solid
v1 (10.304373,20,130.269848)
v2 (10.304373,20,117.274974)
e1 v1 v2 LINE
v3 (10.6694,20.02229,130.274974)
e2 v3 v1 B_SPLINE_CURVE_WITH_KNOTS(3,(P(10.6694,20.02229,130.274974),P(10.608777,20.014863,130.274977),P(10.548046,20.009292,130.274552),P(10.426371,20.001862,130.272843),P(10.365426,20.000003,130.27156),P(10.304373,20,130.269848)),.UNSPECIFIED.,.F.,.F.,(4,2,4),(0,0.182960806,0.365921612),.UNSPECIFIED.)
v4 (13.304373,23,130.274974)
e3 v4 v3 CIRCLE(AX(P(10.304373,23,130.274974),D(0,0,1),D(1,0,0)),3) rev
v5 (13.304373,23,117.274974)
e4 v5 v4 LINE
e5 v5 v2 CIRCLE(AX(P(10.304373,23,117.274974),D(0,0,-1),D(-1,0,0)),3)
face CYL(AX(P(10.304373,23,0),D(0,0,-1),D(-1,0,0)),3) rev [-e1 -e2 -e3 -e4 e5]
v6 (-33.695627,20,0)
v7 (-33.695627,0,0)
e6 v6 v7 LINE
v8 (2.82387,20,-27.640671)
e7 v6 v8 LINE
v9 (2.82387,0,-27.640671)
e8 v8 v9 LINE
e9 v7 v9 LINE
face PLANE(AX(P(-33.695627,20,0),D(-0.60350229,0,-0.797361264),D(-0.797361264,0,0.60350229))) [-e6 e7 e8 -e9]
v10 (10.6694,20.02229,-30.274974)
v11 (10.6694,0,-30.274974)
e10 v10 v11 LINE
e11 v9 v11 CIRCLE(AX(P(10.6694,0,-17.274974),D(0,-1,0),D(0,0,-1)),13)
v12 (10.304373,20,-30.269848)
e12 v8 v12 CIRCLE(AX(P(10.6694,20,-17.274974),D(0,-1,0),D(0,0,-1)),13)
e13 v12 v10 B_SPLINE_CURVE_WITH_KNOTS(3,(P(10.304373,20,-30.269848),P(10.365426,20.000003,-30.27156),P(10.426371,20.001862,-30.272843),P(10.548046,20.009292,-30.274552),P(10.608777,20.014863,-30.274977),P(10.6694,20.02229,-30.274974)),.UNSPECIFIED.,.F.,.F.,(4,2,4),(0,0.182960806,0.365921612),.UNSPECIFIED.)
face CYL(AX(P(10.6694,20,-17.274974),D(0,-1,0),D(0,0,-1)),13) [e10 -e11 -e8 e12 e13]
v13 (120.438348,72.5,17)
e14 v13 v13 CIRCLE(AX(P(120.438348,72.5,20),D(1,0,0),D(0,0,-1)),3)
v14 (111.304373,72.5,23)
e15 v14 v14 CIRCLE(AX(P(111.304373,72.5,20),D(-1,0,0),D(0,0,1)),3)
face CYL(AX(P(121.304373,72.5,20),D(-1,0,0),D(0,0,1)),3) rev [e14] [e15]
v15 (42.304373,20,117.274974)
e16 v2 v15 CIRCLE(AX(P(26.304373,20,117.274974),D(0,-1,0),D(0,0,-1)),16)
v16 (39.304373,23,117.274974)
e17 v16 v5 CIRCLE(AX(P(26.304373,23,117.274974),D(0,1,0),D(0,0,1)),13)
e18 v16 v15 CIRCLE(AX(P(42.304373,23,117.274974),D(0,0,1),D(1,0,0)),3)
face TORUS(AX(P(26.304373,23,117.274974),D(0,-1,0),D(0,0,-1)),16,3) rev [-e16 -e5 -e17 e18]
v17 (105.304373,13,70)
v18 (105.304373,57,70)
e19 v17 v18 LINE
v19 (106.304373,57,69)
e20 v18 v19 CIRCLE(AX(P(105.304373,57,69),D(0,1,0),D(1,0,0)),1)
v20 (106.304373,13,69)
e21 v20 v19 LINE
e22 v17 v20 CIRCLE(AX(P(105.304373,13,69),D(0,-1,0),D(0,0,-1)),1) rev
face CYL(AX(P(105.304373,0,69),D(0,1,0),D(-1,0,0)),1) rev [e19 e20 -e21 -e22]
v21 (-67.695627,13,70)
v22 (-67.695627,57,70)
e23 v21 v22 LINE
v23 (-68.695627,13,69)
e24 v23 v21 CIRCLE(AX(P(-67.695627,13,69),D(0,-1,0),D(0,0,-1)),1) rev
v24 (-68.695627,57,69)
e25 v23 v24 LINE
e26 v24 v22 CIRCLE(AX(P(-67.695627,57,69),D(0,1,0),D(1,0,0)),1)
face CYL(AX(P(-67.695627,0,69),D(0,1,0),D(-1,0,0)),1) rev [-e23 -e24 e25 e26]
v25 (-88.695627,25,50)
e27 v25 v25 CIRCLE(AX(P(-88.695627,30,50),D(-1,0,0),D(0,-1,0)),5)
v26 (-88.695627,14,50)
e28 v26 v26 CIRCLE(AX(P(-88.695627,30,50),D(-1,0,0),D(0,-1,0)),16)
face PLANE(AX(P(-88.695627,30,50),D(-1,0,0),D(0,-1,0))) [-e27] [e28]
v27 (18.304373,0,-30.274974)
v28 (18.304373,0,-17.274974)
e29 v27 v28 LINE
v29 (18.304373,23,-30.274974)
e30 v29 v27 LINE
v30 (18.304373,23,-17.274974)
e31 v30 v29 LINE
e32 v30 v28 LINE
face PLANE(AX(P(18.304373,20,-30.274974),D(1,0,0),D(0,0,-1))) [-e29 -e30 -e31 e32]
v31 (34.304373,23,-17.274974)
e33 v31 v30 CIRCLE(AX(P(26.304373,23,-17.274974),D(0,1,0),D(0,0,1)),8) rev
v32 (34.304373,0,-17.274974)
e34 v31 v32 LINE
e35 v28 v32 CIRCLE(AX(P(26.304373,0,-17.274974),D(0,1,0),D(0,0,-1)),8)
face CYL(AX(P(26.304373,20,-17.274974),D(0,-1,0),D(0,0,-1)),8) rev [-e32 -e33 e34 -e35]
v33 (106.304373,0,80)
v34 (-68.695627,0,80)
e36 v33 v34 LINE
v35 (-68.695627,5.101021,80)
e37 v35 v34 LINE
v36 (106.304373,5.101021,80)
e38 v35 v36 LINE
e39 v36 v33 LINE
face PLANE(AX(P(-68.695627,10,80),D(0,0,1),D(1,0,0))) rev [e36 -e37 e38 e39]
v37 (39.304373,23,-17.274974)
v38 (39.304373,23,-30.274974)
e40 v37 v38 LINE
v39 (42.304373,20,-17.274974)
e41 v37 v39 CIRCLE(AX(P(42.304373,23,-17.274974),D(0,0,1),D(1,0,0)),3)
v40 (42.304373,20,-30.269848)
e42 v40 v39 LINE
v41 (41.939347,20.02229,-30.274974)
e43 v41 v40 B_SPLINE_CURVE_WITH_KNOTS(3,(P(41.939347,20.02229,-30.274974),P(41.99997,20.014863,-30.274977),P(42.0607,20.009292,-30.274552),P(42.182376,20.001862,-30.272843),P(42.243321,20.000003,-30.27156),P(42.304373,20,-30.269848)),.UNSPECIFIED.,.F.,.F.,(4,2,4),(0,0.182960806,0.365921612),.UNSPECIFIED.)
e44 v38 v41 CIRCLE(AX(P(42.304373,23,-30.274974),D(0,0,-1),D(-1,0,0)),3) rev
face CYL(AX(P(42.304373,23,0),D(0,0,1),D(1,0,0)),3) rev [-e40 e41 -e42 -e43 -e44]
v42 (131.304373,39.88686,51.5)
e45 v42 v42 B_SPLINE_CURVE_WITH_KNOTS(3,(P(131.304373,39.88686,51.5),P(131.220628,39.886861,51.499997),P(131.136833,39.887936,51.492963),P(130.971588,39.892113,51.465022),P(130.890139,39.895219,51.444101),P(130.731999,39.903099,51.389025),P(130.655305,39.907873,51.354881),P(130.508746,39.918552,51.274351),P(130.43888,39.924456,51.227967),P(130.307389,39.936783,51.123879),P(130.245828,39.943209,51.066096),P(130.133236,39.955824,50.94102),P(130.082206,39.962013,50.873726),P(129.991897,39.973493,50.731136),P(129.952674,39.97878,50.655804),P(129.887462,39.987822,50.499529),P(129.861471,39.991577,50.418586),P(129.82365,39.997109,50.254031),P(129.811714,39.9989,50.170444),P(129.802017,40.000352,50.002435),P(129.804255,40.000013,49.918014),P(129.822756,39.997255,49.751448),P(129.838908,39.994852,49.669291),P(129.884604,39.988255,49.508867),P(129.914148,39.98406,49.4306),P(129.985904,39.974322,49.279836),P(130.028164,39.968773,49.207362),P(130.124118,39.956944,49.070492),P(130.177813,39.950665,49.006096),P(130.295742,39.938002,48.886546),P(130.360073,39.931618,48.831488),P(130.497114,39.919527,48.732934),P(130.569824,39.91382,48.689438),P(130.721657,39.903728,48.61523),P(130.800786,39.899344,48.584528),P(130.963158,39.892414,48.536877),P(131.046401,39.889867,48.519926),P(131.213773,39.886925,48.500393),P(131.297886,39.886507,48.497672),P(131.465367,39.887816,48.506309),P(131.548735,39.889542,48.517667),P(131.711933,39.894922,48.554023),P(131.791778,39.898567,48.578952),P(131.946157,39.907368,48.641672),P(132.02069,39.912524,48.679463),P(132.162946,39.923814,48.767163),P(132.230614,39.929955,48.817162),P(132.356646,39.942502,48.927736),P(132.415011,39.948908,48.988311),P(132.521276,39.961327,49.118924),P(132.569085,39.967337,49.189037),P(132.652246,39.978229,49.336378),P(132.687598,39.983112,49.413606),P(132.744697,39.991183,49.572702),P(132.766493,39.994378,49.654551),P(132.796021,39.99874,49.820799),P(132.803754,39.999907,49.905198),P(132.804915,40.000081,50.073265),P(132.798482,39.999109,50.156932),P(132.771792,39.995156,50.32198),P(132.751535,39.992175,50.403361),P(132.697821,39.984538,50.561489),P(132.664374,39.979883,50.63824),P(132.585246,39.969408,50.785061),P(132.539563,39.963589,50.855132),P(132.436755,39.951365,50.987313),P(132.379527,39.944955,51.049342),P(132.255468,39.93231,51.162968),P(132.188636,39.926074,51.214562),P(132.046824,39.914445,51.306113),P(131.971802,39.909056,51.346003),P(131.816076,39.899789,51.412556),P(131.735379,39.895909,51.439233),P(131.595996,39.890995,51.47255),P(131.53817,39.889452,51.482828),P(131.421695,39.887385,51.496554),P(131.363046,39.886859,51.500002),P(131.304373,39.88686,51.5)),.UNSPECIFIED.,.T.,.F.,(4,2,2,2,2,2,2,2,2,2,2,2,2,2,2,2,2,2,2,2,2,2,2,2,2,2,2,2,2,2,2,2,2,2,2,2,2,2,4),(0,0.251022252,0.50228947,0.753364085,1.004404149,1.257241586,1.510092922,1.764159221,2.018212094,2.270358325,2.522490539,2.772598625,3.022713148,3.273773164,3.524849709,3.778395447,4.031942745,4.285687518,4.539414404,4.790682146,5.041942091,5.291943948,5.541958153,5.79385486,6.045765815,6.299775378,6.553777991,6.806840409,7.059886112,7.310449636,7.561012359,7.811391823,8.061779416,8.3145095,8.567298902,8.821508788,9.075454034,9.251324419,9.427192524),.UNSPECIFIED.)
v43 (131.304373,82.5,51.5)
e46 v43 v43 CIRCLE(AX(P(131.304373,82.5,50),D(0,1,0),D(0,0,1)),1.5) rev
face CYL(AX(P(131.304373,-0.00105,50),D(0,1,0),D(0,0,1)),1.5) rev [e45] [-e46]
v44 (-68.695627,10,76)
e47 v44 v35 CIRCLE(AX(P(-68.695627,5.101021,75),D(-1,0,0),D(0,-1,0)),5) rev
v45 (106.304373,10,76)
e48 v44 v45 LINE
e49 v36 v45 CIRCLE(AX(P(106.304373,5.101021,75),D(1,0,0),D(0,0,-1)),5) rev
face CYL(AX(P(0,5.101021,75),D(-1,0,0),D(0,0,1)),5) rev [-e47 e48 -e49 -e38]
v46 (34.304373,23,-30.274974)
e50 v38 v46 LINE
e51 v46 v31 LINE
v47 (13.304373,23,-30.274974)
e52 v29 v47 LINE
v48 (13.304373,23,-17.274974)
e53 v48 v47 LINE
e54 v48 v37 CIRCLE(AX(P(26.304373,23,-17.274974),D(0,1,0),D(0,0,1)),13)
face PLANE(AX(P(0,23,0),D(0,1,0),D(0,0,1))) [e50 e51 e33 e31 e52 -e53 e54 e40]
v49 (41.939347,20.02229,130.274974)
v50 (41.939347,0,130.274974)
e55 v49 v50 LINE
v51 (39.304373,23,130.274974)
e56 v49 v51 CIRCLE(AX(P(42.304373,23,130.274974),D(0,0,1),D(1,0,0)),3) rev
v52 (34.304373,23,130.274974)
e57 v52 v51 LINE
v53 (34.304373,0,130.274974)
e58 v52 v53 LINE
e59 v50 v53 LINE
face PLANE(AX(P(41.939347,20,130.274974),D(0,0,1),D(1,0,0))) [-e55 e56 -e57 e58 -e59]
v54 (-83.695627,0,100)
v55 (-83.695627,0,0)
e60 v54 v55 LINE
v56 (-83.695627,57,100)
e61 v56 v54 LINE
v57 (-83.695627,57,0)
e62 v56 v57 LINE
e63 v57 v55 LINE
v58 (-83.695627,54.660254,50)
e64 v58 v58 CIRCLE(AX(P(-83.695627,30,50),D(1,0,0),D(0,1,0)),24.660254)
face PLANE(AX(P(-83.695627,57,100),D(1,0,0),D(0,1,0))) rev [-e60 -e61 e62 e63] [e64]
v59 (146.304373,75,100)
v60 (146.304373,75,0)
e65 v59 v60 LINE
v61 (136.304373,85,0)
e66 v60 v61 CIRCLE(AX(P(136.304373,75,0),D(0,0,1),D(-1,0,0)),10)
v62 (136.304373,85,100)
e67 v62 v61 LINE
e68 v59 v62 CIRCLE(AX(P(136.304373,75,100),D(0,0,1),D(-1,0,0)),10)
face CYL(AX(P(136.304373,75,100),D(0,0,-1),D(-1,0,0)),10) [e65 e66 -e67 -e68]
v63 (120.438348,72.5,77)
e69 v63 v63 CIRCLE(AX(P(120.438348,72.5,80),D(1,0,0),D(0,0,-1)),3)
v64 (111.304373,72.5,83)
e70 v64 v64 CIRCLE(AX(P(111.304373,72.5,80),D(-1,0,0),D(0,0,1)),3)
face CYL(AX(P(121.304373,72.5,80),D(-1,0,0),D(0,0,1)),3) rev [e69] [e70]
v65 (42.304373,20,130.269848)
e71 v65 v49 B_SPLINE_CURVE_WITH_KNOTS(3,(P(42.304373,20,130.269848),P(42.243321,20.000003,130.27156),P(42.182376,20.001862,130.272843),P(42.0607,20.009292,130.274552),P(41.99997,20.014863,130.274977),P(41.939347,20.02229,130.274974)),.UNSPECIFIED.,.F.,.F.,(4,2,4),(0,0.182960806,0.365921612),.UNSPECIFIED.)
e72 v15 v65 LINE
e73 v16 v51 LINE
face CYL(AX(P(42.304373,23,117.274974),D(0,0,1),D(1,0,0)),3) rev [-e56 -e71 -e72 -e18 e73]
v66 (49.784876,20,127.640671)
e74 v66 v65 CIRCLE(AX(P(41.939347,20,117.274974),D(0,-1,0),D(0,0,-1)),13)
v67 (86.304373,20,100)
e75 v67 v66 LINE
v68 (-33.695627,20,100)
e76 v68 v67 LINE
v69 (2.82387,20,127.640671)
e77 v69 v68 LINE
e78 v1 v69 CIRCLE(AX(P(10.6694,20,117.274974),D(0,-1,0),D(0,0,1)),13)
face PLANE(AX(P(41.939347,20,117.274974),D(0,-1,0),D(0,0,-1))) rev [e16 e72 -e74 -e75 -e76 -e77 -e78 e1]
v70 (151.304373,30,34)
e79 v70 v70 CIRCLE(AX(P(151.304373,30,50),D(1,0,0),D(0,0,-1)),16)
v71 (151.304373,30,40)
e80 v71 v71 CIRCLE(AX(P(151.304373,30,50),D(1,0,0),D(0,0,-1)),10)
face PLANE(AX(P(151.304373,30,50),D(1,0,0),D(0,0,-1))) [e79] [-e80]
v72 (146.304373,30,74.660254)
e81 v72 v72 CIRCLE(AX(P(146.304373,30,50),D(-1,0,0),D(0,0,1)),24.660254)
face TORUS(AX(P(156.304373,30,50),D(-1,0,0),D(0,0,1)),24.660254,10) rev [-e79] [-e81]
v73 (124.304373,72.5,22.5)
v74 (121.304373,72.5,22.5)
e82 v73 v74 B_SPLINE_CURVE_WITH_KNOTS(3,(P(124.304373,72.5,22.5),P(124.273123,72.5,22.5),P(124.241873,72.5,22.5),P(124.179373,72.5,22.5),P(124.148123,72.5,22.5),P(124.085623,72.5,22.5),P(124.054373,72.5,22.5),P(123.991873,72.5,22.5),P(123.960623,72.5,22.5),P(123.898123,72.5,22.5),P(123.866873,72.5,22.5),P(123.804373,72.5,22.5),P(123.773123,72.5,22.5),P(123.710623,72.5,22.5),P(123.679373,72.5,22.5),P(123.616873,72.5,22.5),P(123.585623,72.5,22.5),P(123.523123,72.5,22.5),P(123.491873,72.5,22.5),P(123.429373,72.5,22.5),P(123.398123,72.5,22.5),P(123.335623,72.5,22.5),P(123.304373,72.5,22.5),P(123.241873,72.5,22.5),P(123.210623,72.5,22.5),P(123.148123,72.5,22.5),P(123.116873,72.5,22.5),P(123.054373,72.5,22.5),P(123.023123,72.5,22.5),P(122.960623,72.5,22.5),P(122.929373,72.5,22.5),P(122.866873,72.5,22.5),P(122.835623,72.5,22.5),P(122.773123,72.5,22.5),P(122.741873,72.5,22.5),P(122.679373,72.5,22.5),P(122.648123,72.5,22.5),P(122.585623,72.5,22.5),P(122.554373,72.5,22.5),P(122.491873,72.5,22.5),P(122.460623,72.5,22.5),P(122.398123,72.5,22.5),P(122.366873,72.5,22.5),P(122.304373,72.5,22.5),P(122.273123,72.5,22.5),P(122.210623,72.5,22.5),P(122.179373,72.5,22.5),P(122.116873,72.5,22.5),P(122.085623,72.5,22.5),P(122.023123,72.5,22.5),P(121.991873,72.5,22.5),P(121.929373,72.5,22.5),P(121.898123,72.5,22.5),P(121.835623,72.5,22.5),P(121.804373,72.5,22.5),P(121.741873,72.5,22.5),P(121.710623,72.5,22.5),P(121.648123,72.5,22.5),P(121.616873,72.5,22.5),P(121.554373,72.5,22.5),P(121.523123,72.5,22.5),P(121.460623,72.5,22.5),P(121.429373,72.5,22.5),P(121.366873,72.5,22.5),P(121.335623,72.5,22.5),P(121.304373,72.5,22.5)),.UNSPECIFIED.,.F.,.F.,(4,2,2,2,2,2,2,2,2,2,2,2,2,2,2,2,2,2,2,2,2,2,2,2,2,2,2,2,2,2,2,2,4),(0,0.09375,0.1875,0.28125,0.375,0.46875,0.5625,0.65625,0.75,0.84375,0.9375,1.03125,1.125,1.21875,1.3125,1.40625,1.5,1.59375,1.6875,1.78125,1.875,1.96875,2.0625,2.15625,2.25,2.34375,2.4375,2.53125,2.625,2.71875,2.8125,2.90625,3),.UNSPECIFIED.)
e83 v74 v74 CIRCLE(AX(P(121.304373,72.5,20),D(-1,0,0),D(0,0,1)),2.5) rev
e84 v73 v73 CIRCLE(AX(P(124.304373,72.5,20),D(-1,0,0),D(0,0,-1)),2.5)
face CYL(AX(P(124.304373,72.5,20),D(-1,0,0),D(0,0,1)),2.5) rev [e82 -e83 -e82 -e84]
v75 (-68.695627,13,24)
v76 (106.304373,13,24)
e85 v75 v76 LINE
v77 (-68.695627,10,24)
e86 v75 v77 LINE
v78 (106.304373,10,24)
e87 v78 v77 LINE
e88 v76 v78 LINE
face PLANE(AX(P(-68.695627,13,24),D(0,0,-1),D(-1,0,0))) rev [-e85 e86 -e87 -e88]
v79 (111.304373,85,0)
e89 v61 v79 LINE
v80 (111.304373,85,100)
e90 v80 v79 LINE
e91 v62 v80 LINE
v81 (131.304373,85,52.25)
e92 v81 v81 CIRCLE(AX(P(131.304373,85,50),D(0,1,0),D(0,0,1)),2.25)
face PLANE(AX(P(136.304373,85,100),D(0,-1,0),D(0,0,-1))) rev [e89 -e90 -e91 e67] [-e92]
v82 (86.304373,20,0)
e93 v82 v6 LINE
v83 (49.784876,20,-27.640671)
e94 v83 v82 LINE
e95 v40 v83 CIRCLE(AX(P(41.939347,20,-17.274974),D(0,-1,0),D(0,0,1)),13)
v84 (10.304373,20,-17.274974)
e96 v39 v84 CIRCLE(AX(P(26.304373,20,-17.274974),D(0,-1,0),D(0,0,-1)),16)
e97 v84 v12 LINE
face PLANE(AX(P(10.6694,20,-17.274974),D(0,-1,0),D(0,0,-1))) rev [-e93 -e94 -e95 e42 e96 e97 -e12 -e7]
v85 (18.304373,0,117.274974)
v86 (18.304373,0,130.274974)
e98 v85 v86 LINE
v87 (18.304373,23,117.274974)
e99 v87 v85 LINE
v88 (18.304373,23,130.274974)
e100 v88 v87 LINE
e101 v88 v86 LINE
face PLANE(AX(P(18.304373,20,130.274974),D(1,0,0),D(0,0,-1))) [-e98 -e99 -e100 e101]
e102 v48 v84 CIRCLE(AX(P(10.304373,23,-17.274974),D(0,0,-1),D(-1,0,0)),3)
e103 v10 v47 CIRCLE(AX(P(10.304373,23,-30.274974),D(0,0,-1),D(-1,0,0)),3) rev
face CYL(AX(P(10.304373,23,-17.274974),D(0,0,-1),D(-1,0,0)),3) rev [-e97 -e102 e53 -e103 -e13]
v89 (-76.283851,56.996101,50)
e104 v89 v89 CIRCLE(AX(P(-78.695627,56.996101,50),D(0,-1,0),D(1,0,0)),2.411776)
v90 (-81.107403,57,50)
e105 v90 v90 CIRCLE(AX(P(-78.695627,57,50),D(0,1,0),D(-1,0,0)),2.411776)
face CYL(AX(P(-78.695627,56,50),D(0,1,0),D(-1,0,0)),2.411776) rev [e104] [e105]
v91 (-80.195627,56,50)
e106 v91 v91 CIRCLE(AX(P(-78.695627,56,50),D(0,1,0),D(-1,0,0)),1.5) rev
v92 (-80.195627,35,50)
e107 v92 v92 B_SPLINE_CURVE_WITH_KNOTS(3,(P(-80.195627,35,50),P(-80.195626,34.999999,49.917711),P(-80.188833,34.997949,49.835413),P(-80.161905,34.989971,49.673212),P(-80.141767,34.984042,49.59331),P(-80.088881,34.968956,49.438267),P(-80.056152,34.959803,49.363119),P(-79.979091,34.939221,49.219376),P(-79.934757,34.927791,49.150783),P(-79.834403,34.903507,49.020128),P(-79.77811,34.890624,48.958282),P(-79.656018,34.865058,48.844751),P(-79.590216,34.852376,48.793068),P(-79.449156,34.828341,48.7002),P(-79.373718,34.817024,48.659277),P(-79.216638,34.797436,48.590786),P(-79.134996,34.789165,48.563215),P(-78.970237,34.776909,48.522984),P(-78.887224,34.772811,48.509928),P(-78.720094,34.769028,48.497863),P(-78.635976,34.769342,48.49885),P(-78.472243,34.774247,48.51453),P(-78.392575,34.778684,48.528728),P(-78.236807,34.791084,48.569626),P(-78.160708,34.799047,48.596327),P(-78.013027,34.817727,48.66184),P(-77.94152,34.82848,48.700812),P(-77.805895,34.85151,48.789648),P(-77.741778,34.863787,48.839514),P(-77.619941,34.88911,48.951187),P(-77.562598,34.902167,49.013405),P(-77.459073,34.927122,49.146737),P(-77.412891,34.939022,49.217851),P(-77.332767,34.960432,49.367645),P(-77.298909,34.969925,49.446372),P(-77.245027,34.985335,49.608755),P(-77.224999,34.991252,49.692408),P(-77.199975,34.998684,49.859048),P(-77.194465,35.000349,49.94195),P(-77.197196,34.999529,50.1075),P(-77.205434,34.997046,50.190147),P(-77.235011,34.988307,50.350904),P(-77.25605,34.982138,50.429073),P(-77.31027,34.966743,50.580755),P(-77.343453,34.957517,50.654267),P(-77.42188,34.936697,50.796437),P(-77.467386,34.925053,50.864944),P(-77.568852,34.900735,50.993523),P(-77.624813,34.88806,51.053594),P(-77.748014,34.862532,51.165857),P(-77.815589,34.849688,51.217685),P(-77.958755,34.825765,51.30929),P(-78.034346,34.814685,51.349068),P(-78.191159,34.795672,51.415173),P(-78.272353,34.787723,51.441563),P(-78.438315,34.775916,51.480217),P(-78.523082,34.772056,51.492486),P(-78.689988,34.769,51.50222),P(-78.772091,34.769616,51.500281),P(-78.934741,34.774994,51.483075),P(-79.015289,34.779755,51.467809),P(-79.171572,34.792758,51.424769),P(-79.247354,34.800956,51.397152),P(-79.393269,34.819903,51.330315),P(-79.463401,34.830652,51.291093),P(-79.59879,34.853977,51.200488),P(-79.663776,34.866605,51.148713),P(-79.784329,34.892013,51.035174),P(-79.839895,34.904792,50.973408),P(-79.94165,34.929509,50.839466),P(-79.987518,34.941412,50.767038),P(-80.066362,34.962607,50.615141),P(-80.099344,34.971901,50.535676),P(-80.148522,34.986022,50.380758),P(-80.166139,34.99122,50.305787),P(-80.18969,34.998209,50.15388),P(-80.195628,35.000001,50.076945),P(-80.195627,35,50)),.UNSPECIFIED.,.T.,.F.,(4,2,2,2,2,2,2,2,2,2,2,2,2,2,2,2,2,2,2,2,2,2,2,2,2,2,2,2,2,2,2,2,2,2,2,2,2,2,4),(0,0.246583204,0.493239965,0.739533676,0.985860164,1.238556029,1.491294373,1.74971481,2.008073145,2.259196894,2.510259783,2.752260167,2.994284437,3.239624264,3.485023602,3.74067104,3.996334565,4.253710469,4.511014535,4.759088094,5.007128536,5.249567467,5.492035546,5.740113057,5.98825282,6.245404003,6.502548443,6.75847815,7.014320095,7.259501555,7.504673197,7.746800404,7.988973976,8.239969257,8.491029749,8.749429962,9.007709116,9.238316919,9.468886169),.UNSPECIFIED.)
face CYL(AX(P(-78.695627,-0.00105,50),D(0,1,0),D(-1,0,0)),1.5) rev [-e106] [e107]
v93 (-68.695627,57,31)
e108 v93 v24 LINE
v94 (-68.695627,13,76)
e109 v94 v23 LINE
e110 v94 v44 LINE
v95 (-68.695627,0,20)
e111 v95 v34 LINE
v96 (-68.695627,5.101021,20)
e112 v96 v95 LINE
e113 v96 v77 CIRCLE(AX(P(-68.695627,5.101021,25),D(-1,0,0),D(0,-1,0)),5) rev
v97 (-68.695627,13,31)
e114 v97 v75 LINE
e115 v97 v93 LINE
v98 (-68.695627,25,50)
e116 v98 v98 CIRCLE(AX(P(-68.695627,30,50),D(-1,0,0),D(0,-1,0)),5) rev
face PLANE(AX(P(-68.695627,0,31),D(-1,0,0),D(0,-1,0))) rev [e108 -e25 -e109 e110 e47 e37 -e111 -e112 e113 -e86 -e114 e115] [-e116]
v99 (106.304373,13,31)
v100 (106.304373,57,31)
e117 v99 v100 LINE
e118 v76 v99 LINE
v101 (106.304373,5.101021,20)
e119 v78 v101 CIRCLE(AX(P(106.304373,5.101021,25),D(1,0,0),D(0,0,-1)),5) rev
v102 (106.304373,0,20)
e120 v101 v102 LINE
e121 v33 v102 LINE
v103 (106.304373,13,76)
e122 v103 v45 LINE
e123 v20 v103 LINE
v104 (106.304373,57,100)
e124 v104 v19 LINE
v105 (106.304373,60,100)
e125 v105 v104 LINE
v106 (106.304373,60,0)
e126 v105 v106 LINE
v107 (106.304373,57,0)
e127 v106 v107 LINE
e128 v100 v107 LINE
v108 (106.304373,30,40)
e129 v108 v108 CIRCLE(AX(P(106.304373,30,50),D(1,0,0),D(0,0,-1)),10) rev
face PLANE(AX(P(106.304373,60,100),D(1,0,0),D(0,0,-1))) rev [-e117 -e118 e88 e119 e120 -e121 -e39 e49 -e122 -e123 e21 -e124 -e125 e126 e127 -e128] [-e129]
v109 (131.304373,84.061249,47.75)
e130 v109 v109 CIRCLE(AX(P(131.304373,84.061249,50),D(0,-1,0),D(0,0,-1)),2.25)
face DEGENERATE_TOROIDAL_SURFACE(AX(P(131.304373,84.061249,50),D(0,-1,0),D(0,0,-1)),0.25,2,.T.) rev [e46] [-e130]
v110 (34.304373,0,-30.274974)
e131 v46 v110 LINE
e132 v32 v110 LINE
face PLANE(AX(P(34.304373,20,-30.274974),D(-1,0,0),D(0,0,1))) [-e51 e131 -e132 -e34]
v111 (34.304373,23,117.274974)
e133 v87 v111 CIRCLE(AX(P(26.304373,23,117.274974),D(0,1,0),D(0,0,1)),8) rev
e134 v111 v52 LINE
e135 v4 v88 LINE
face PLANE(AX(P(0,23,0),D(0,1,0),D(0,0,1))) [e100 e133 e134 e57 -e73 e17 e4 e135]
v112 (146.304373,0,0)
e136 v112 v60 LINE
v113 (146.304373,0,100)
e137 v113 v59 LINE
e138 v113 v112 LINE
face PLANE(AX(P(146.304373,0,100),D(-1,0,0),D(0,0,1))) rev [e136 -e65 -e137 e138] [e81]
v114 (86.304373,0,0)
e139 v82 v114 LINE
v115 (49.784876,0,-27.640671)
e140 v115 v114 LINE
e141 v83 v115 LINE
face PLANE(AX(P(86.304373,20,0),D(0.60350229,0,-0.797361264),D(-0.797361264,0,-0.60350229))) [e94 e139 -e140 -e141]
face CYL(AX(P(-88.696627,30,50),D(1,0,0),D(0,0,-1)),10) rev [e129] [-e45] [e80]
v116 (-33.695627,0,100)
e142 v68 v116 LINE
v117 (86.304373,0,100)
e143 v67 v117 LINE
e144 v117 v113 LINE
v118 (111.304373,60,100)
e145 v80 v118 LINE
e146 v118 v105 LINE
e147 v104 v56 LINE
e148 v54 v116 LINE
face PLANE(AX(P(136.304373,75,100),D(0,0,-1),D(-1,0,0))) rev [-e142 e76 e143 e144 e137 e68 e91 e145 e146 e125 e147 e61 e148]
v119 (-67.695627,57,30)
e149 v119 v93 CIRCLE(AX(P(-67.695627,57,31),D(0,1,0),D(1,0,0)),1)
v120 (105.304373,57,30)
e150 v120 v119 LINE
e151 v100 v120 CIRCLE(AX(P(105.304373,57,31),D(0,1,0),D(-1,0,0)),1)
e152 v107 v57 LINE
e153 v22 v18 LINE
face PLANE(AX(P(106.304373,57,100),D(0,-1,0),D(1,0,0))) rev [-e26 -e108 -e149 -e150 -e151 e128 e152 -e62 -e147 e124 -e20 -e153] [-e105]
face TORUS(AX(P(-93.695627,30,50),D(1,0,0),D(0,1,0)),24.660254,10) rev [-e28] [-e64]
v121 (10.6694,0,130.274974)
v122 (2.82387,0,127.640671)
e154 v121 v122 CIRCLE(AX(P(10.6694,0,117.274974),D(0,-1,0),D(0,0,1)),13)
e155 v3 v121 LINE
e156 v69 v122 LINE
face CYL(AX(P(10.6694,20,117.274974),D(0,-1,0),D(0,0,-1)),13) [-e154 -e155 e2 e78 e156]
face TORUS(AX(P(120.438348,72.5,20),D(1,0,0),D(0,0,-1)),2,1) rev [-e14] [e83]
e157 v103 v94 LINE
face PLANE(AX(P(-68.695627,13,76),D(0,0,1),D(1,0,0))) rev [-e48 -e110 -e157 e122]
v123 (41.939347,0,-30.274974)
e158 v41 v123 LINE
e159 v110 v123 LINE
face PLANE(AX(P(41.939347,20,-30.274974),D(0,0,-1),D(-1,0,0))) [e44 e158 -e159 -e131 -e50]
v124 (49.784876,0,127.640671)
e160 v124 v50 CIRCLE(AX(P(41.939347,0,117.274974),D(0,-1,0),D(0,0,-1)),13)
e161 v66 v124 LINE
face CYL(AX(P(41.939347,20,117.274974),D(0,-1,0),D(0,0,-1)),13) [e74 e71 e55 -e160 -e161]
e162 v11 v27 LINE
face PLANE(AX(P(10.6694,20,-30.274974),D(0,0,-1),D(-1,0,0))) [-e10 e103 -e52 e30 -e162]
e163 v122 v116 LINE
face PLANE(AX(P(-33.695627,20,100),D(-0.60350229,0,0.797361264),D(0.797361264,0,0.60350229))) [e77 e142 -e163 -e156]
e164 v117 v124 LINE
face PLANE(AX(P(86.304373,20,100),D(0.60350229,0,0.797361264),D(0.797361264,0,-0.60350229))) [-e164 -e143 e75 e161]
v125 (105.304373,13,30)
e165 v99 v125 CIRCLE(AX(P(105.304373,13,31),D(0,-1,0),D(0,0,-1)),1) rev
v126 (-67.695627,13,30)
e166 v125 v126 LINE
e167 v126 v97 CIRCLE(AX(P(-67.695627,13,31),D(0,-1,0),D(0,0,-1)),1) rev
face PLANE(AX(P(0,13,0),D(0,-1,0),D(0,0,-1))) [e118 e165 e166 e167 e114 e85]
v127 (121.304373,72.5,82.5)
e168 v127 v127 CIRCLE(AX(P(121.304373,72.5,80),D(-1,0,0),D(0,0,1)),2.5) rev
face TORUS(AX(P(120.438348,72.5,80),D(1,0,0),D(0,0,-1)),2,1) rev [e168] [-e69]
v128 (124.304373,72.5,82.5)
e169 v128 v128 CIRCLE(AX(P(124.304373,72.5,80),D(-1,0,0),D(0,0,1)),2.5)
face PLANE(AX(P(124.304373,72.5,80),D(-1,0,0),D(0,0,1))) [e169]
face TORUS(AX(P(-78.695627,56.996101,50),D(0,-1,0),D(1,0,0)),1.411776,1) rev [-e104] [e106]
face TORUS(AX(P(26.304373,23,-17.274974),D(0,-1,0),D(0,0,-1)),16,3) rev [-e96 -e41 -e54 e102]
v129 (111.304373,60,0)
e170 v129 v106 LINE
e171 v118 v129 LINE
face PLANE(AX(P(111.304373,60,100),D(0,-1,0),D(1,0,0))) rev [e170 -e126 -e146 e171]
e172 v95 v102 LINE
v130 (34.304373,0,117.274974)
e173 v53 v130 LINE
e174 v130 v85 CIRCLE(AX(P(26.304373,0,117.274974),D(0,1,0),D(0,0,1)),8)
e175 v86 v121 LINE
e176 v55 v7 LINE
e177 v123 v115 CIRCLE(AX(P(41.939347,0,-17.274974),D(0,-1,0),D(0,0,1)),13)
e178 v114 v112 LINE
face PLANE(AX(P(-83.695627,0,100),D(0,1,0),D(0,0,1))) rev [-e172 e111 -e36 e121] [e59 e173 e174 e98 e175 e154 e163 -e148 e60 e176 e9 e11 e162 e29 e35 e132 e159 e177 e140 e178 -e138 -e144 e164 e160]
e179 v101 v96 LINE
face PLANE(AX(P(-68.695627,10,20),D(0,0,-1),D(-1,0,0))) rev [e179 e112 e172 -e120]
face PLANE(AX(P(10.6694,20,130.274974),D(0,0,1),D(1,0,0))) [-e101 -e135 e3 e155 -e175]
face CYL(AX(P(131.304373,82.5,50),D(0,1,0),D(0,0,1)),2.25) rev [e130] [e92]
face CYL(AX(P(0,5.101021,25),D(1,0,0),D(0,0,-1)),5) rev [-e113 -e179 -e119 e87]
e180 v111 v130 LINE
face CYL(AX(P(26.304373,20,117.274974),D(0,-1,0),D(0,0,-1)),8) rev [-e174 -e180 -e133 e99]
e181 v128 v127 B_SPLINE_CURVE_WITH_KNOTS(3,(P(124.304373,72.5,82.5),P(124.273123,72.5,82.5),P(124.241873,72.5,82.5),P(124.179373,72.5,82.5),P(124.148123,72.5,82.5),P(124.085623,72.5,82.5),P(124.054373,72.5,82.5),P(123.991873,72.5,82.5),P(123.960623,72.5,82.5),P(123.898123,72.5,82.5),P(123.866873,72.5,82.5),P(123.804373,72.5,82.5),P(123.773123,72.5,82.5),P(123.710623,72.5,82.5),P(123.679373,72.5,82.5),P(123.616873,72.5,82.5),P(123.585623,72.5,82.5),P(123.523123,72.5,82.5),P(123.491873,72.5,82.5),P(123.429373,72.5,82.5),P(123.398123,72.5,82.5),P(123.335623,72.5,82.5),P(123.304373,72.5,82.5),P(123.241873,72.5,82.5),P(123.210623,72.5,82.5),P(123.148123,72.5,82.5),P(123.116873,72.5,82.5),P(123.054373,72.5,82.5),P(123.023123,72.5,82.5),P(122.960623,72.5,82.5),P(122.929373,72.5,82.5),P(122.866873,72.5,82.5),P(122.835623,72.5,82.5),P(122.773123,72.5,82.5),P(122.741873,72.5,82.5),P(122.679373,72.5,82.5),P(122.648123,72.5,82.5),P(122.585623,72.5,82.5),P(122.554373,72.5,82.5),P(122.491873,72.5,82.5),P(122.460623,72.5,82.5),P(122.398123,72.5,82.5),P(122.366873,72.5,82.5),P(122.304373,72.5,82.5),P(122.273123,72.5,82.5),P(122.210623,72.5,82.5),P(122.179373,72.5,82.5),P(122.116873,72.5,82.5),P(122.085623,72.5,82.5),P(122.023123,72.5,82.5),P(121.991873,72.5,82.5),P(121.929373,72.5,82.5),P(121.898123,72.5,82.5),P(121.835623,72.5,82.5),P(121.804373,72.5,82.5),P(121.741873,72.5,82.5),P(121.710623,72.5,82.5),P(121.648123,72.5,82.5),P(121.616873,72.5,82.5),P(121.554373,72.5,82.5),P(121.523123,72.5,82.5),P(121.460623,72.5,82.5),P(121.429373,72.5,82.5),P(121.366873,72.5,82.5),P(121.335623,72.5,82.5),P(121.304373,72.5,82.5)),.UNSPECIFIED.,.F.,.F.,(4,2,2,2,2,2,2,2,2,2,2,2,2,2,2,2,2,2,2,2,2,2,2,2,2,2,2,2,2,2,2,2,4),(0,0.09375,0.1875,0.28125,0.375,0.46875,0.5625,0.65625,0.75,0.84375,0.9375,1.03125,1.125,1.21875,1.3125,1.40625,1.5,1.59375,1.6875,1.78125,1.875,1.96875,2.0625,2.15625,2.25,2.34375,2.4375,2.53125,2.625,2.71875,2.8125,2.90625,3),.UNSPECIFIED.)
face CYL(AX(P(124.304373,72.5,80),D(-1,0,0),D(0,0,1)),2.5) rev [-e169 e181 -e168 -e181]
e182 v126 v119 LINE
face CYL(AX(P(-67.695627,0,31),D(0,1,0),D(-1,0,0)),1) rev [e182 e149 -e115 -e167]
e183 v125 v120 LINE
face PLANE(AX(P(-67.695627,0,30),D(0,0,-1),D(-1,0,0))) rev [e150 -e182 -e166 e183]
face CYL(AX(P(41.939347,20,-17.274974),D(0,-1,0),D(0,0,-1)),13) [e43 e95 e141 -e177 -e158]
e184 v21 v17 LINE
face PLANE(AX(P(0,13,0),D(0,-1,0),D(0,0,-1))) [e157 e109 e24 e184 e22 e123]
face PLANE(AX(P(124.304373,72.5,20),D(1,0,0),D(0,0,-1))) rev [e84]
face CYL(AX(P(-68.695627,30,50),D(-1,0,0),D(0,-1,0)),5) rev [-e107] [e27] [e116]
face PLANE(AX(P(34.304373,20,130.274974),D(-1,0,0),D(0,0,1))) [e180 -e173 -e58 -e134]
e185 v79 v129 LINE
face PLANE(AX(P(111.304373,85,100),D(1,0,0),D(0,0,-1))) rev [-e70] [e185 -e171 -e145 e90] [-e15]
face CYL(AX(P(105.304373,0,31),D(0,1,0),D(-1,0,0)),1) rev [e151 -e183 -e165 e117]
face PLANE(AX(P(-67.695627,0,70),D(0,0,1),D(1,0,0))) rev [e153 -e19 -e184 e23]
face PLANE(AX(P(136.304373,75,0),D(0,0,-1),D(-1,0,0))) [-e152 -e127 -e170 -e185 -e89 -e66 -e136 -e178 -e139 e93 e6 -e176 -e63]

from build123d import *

# Parameters (mm, degrees)
BOSS_EXTRUDE1_DEPTH     = 100
SKETCH2_R               = 16
BOSS_EXTRUDE2_DEPTH     = 5
FILLET1_R               = 10
SKETCH3_R               = 16
BOSS_EXTRUDE3_DEPTH     = 5
FILLET2_R               = 10
SKETCH4_R               = 5
CUT_EXTRUDE1_DEPTH      = 20
CUT_EXTRUDE2_DEPTH      = 191.110529256
CUT_EXTRUDE3_REACH      = 275.542
SKETCH6_R               = 10
BOSS_EXTRUDE5_DEPTH     = 20
BOSS_EXTRUDE6_DEPTH     = 3
FILLET3_R               = 3
BOSS_EXTRUDE7_DEPTH     = 3
FILLET4_R               = 3
CUT_EXTRUDE4_REACH      = 209.638
CUT_EXTRUDE4_END_RADIUS = 5
SKETCH14_R              = 1.5
SKETCH15_R              = 2.411776211
CUT_EXTRUDE5_DEPTH      = 1
FILLET5_R               = 1
SKETCH16_R              = 2.5
CUT_EXTRUDE6_DEPTH      = 13
SKETCH18_R              = 3
CUT_EXTRUDE7_DEPTH      = 10
FILLET6_R               = 1
SKETCH20_R              = 3
CUT_EXTRUDE8_DEPTH      = 10
FILLET7_R               = 1
CUT_EXTRUDE9_REACH      = 219.001
CUT_EXTRUDE9_END_RADIUS = 10
SKETCH21_R              = 1.5
SKETCH22_R              = 2.25
CUT_EXTRUDE10_DEPTH     = 2.5
FILLET8_R               = 2
SKETCH23_W              = 175
SKETCH23_H              = 52
CUT_EXTRUDE11_DEPTH     = 13
SKETCH25_W              = 175
SKETCH25_H              = 60
CUT_EXTRUDE12_DEPTH     = 10
FILLET9_R               = 5


# Some blends are built 0.0001 mm under size
with BuildPart() as part:
    # Sketch1 → Boss-Extrude1 (new body)
    with BuildSketch(Plane.XY):
        with BuildLine():
            Line((146.304373149, 0), (146.304373149, 75))
            ThreePointArc((146.304373149, 75), (143.375440961, 82.071067812), (136.304373149, 85))
            Line((136.304373149, 85), (111.304373149, 85))
            Line((111.304373149, 85), (111.304373149, 60))
            Line((111.304373149, 60), (106.304373149, 60))
            Line((106.304373149, 60), (106.304373149, 57))
            Line((106.304373149, 57), (-83.695626851, 57))
            Line((-83.695626851, 57), (-83.695626851, 0))
            Line((-83.695626851, 0), (146.304373149, 0))
        make_face()
    extrude(amount=BOSS_EXTRUDE1_DEPTH)

    # Sketch2 → Boss-Extrude2 (add)
    with BuildSketch(Plane(origin=(146.304373149, 0, 0), x_dir=(0, 0, -1), z_dir=(1, 0, 0))):
        with Locations(Location((-50, 30, 0), (0, 0, 180))):
            Circle(SKETCH2_R)
    extrude(amount=BOSS_EXTRUDE2_DEPTH)

    # Fillet1
    # the kernel refuses this fillet: 10 mm, written as the material it adds along each edge
    with BuildSketch(Plane(origin=(146.304373149, 30, 50), x_dir=(0, 0, 1), z_dir=(0, 1, 0))) as fillet1_piece_1:
        with BuildLine():
            CenterArc((24.660254038, 10), FILLET1_R, 210, 60)
            Line((16, 5), (15.826794919, 4.9))
            ThreePointArc((15.826794919, 4.9), (15.8, 2.5), (15.8, 0))
            Line((15.8, 0), (16, -0.2))
            Line((16, -0.2), (24.660254038, -0.2))
            Line((24.660254038, -0.2), (24.660254038, 0))
        make_face()
    revolve(axis=Axis((146.304373149, 30, 50), (1, 0, 0)))

    # Sketch3 → Boss-Extrude3 (add)
    with BuildSketch(Plane.ZY.offset(83.695626851)):
        with Locations(Location((50, 30, 0), (0, 0, 90))):
            Circle(SKETCH3_R)
    extrude(amount=BOSS_EXTRUDE3_DEPTH)

    # Fillet2
    # the kernel refuses this fillet: 10 mm, written as the material it adds along each edge
    with BuildSketch(Plane(origin=(-83.695626851, 30, 50), x_dir=(0, 1, 0), z_dir=(0, 0, 1))) as fillet2_piece_1:
        with BuildLine():
            CenterArc((24.660254038, 10), FILLET2_R, 210, 60)
            Line((16, 5), (15.826794919, 4.9))
            ThreePointArc((15.826794919, 4.9), (15.8, 2.5), (15.8, 0))
            Line((15.8, 0), (16, -0.2))
            Line((16, -0.2), (24.660254038, -0.2))
            Line((24.660254038, -0.2), (24.660254038, 0))
        make_face()
    revolve(axis=Axis((-83.695626851, 30, 50), (-1, 0, 0)))

    # Sketch4 → Cut-Extrude1 (cut)
    with BuildSketch(Plane.ZY.offset(88.695626851)):
        with Locations(Location((50, 30, 0), (0, 0, 270))):
            Circle(SKETCH4_R)
    extrude(amount=-CUT_EXTRUDE1_DEPTH, mode=Mode.SUBTRACT)

    # Sketch5 → Cut-Extrude2 (cut, through all)
    with BuildSketch(Plane(origin=(0, 57, 0), x_dir=(1, 0, 0), z_dir=(0, 1, 0))):
        with BuildLine():
            Line((-67.695626851, -30), (105.304373149, -30))
            ThreePointArc((105.304373149, -30), (106.011479931, -30.292893219), (106.304373149, -31))
            Line((106.304373149, -31), (106.304373149, -69))
            ThreePointArc((106.304373149, -69), (106.011479931, -69.707106781), (105.304373149, -70))
            Line((105.304373149, -70), (-67.695626851, -70))
            ThreePointArc((-67.695626851, -70), (-68.402733632, -69.707106781), (-68.695626851, -69))
            Line((-68.695626851, -69), (-68.695626851, -31))
            ThreePointArc((-68.695626851, -31), (-68.402733632, -30.292893219), (-67.695626851, -30))
        make_face()
    extrude(amount=-CUT_EXTRUDE2_DEPTH, mode=Mode.SUBTRACT)

    # Sketch6 → Cut-Extrude3 (cut, up to next)
    with BuildSketch(Plane(origin=(151.304373149, 0, 0), x_dir=(0, 0, -1), z_dir=(1, 0, 0)), mode=Mode.PRIVATE) as cut_extrude3_sk1:
        with Locations((-50, 30)):
            Circle(SKETCH6_R)
    cut_extrude3_tool1 = extrude(cut_extrude3_sk1.sketch, amount=-CUT_EXTRUDE3_REACH, mode=Mode.PRIVATE) & part.part
    add(cut_extrude3_tool1.solids().sort_by_distance((151.304373, 30, 50))[0], mode=Mode.SUBTRACT)

    # Sketch7 → Boss-Extrude5 (add)
    with BuildSketch(Plane.XZ):
        with BuildLine():
            Line((-33.695626851, 100), (86.304373149, 100))
            Line((86.304373149, 100), (49.784876297, 127.640670506))
            ThreePointArc((49.784876297, 127.640670506), (46.077337967, 129.598813846), (41.939346526, 130.274974069))
            Line((41.939346526, 130.274974069), (34.304373149, 130.274974069))
            Line((34.304373149, 130.274974069), (34.304373149, 117.274974069))
            ThreePointArc((34.304373149, 117.274974069), (26.304373149, 109.274974069), (18.304373149, 117.274974069))
            Line((18.304373149, 117.274974069), (18.304373149, 130.274974069))
            Line((18.304373149, 130.274974069), (10.669399773, 130.274974069))
            ThreePointArc((10.669399773, 130.274974069), (6.531408332, 129.598813846), (2.823870002, 127.640670506))
            Line((2.823870002, 127.640670506), (-33.695626851, 100))
        make_face()
        with BuildLine():
            Line((18.304373149, -30.274974069), (18.304373149, -17.274974069))
            ThreePointArc((18.304373149, -17.274974069), (26.304373149, -9.274974069), (34.304373149, -17.274974069))
            Line((34.304373149, -17.274974069), (34.304373149, -30.274974069))
            Line((34.304373149, -30.274974069), (41.939346526, -30.274974069))
            ThreePointArc((41.939346526, -30.274974069), (46.077337967, -29.598813846), (49.784876297, -27.640670506))
            Line((49.784876297, -27.640670506), (86.304373149, 0))
            Line((86.304373149, 0), (-33.695626851, 0))
            Line((-33.695626851, 0), (2.823870002, -27.640670506))
            ThreePointArc((2.823870002, -27.640670506), (6.531408332, -29.598813846), (10.669399773, -30.274974069))
            Line((10.669399773, -30.274974069), (18.304373149, -30.274974069))
        make_face()
    extrude(amount=-BOSS_EXTRUDE5_DEPTH)

    # Sketch8 → Boss-Extrude6 (add)
    with BuildSketch(Plane(origin=(0, 20, 0), x_dir=(1, 0, 0), z_dir=(0, 1, 0))):
        with BuildLine():
            ThreePointArc((13.304373149, 17.274974069), (26.304373149, 4.274974069), (39.304373149, 17.274974069))
            Line((39.304373149, 17.274974069), (39.304373149, 30.274974069))
            Line((39.304373149, 30.274974069), (34.304373149, 30.274974069))
            Line((34.304373149, 30.274974069), (34.304373149, 17.556485004))
            Line((34.304373149, 17.556485004), (34.304373149, 17.274974069))
            ThreePointArc((34.304373149, 17.274974069), (26.304373149, 9.274974069), (18.304373149, 17.274974069))
            Line((18.304373149, 17.274974069), (18.304373149, 30.274974069))
            Line((18.304373149, 30.274974069), (13.304373149, 30.274974069))
            Line((13.304373149, 30.274974069), (13.304373149, 17.274974069))
        make_face()
    extrude(amount=BOSS_EXTRUDE6_DEPTH)

    # Fillet3
    fillet3_edges = [part.edges().sort_by_distance(p)[0] for p in [
        (39.304373149, 20, -23.774974069),
        (26.304373149, 20, -4.274974069),
        (13.304373149, 20, -23.774974069),
    ]]
    fillet(fillet3_edges, radius=FILLET3_R - 0.0001)  # a hair under: the kernel refuses the full size

    # Sketch10 → Boss-Extrude7 (add)
    with BuildSketch(Plane(origin=(0, 20, 0), x_dir=(1, 0, 0), z_dir=(0, 1, 0))):
        with BuildLine():
            ThreePointArc((39.304373149, -117.274974069), (26.304373149, -104.274974069), (13.304373149, -117.274974069))
            Line((13.304373149, -117.274974069), (13.304373149, -130.274974069))
            Line((13.304373149, -130.274974069), (18.304373149, -130.274974069))
            Line((18.304373149, -130.274974069), (18.304373149, -117.274974069))
            ThreePointArc((18.304373149, -117.274974069), (26.304373149, -109.274974069), (34.304373149, -117.274974069))
            Line((34.304373149, -117.274974069), (34.304373149, -130.274974069))
            Line((34.304373149, -130.274974069), (39.304373149, -130.274974069))
            Line((39.304373149, -130.274974069), (39.304373149, -117.274974069))
        make_face()
    extrude(amount=BOSS_EXTRUDE7_DEPTH)

    # Fillet4
    fillet4_edges = [part.edges().sort_by_distance(p)[0] for p in [
        (13.304373149, 20, 123.774974069),
        (26.304373149, 20, 104.274974069),
        (39.304373149, 20, 123.774974069),
    ]]
    fillet(fillet4_edges, radius=FILLET4_R - 0.0001)  # a hair under: the kernel refuses the full size

    # Cut-Extrude4: up to this cylinder (the profile starts outside it)
    cut_extrude4_end = Plane(origin=(-78.695627, 30, 50), z_dir=(-1, 0, 0)) * Cylinder(CUT_EXTRUDE4_END_RADIUS, 430.276, mode=Mode.PRIVATE)
    # Sketch14 → Cut-Extrude4 (cut, up to the surface)
    with BuildSketch(Plane(origin=(0, 57, 0), x_dir=(1, 0, 0), z_dir=(0, 1, 0)), mode=Mode.PRIVATE) as cut_extrude4_sk1:
        with Locations(Location((-78.695626851, -50, 0), (0, 0, 180))):
            Circle(SKETCH14_R)
    cut_extrude4_tool1 = extrude(cut_extrude4_sk1.sketch, amount=-CUT_EXTRUDE4_REACH, mode=Mode.PRIVATE) - cut_extrude4_end
    add(cut_extrude4_tool1.solids().sort_by_distance((-78.695627, 57, 50))[0], mode=Mode.SUBTRACT)

    # Sketch15 → Cut-Extrude5 (cut)
    with BuildSketch(Plane(origin=(0, 57, 0), x_dir=(1, 0, 0), z_dir=(0, 1, 0))):
        with Locations(Location((-78.695626851, -50, 0), (0, 0, 180))):
            Circle(SKETCH15_R)
    extrude(amount=-CUT_EXTRUDE5_DEPTH, mode=Mode.SUBTRACT)

    # Fillet5
    # the kernel refuses this fillet: 1 mm, written as the material it adds along each edge
    with BuildSketch(Plane(origin=(-78.695626851, 56, 50), x_dir=(-1, 0, 0), z_dir=(0, 0, -1))) as fillet5_piece_1:
        with BuildLine():
            CenterArc((1.411776211, 0.996100679), FILLET5_R, 275.061431189, 84.938568811)
            Line((1.5, 0), (1.501764476, -0.019922014))
            ThreePointArc((1.501764476, -0.019922014), (1.955888106, -0.02), (2.411776211, -0.02))
            Line((2.411776211, -0.02), (2.431776211, 0))
            Line((2.431776211, 0), (2.431776211, 0.996100679))
            Line((2.431776211, 0.996100679), (2.411776211, 0.996100679))
        make_face()
    revolve(axis=Axis((-78.695626851, 56, 50), (0, 1, 0)))

    # Sketch16 → Cut-Extrude6 (cut)
    with BuildSketch(Plane.ZY.offset(-111.304373149)):
        with Locations((80, 72.5)):
            Circle(SKETCH16_R)
        with Locations((20, 72.5)):
            Circle(SKETCH16_R)
    extrude(amount=-CUT_EXTRUDE6_DEPTH, mode=Mode.SUBTRACT)

    # Sketch18 → Cut-Extrude7 (cut)
    with BuildSketch(Plane.ZY.offset(-111.304373149)):
        with Locations((80, 72.5)):
            Circle(SKETCH18_R)
    extrude(amount=-CUT_EXTRUDE7_DEPTH, mode=Mode.SUBTRACT)

    # Fillet6
    # the kernel refuses this fillet: 1 mm, written as the material it adds along each edge
    with BuildSketch(Plane(origin=(121.304373149, 72.5, 80), x_dir=(0, 0, 1), z_dir=(0, -1, 0))) as fillet6_piece_1:
        with BuildLine():
            CenterArc((2, 0.866025404), FILLET6_R, 300, 60)
            Line((2.5, 0), (2.51, -0.017320508))
            ThreePointArc((2.51, -0.017320508), (2.75, -0.02), (3, -0.02))
            Line((3, -0.02), (3.02, 0))
            Line((3.02, 0), (3.02, 0.866025404))
            Line((3.02, 0.866025404), (3, 0.866025404))
        make_face()
    revolve(axis=Axis((121.304373149, 72.5, 80), (-1, 0, 0)))

    # Sketch20 → Cut-Extrude8 (cut)
    with BuildSketch(Plane.ZY.offset(-111.304373149)):
        with Locations((20, 72.5)):
            Circle(SKETCH20_R)
    extrude(amount=-CUT_EXTRUDE8_DEPTH, mode=Mode.SUBTRACT)

    # Fillet7
    # the kernel refuses this fillet: 1 mm, written as the material it adds along each edge
    with BuildSketch(Plane(origin=(121.304373149, 72.5, 20), x_dir=(0, 0, 1), z_dir=(0, -1, 0))) as fillet7_piece_1:
        with BuildLine():
            CenterArc((2, 0.866025404), FILLET7_R, 300, 60)
            Line((2.5, 0), (2.51, -0.017320508))
            ThreePointArc((2.51, -0.017320508), (2.75, -0.02), (3, -0.02))
            Line((3, -0.02), (3.02, 0))
            Line((3.02, 0), (3.02, 0.866025404))
            Line((3.02, 0.866025404), (3, 0.866025404))
        make_face()
    revolve(axis=Axis((121.304373149, 72.5, 20), (-1, 0, 0)))

    # Cut-Extrude9: up to this cylinder (the profile starts outside it)
    cut_extrude9_end = Plane(origin=(131.304373, 30, 50), z_dir=(1, 0, 0)) * Cylinder(CUT_EXTRUDE9_END_RADIUS, 459.002, mode=Mode.PRIVATE)
    # Sketch21 → Cut-Extrude9 (cut, up to the surface)
    with BuildSketch(Plane(origin=(0, 85, 0), x_dir=(1, 0, 0), z_dir=(0, 1, 0)), mode=Mode.PRIVATE) as cut_extrude9_sk1:
        with Locations(Location((131.304373149, -50, 0), (0, 0, 270))):
            Circle(SKETCH21_R)
    cut_extrude9_tool1 = extrude(cut_extrude9_sk1.sketch, amount=-CUT_EXTRUDE9_REACH, mode=Mode.PRIVATE) - cut_extrude9_end
    add(cut_extrude9_tool1.solids().sort_by_distance((131.304373, 85, 50))[0], mode=Mode.SUBTRACT)

    # Sketch22 → Cut-Extrude10 (cut)
    with BuildSketch(Plane(origin=(0, 85, 0), x_dir=(1, 0, 0), z_dir=(0, 1, 0))):
        with Locations(Location((131.304373149, -50, 0), (0, 0, 270))):
            Circle(SKETCH22_R)
    extrude(amount=-CUT_EXTRUDE10_DEPTH, mode=Mode.SUBTRACT)

    # Fillet8
    # the kernel refuses this fillet: 2 mm, written as the material it adds along each edge
    with BuildSketch(Plane(origin=(131.304373149, 82.5, 50), x_dir=(0, 0, 1), z_dir=(-1, 0, 0))) as fillet8_piece_1:
        with BuildLine():
            CenterArc((0.25, 1.5612495), FILLET8_R, 308.682187453, 51.317812547)
            Line((1.5, 0), (1.525, -0.03122499))
            ThreePointArc((1.525, -0.03122499), (1.875, -0.04), (2.25, -0.04))
            Line((2.25, -0.04), (2.29, 0))
            Line((2.29, 0), (2.29, 1.5612495))
            Line((2.29, 1.5612495), (2.25, 1.5612495))
        make_face()
    revolve(axis=Axis((131.304373149, 82.5, 50), (0, 1, 0)))

    # Sketch23 → Cut-Extrude11 (cut)
    with BuildSketch(Plane.XZ):
        with Locations((18.804373149, 50)):
            Rectangle(SKETCH23_W, SKETCH23_H)
    extrude(amount=-CUT_EXTRUDE11_DEPTH, mode=Mode.SUBTRACT)

    # Sketch25 → Cut-Extrude12 (cut)
    with BuildSketch(Plane.XZ):
        with Locations((18.804373149, 50)):
            Rectangle(SKETCH25_W, SKETCH25_H)
    extrude(amount=-CUT_EXTRUDE12_DEPTH, mode=Mode.SUBTRACT)

    # Fillet9
    # the kernel refuses this fillet: 5 mm, written as the material it adds along each edge
    with BuildSketch(Plane(origin=(-80.943075564, 10, 80), x_dir=(0, -1.5667467323505199e-12, -1.0), z_dir=(1, 0, 0)), Plane(origin=(118.551821863, 10, 20), x_dir=(0, -1.5742962489179645e-12, 1.0), z_dir=(-1, 0, 0))) as fillet9_piece_1:
        with BuildLine():
            CenterArc((5, -4.898979486), FILLET9_R, 101.536959033, 78.463040967)
            Line((0, -4.898979486), (-0.1, -4.898979486))
            Line((-0.1, -4.898979486), (-0.1, 0))
            Line((-0.1, 0), (0, 0.1))
            ThreePointArc((0, 0.1), (2, 0.1), (3.98, 0.09797959))
            Line((3.98, 0.09797959), (4, 0))
        make_face()
    extrude(amount=199.494897428)


solid = part.part
